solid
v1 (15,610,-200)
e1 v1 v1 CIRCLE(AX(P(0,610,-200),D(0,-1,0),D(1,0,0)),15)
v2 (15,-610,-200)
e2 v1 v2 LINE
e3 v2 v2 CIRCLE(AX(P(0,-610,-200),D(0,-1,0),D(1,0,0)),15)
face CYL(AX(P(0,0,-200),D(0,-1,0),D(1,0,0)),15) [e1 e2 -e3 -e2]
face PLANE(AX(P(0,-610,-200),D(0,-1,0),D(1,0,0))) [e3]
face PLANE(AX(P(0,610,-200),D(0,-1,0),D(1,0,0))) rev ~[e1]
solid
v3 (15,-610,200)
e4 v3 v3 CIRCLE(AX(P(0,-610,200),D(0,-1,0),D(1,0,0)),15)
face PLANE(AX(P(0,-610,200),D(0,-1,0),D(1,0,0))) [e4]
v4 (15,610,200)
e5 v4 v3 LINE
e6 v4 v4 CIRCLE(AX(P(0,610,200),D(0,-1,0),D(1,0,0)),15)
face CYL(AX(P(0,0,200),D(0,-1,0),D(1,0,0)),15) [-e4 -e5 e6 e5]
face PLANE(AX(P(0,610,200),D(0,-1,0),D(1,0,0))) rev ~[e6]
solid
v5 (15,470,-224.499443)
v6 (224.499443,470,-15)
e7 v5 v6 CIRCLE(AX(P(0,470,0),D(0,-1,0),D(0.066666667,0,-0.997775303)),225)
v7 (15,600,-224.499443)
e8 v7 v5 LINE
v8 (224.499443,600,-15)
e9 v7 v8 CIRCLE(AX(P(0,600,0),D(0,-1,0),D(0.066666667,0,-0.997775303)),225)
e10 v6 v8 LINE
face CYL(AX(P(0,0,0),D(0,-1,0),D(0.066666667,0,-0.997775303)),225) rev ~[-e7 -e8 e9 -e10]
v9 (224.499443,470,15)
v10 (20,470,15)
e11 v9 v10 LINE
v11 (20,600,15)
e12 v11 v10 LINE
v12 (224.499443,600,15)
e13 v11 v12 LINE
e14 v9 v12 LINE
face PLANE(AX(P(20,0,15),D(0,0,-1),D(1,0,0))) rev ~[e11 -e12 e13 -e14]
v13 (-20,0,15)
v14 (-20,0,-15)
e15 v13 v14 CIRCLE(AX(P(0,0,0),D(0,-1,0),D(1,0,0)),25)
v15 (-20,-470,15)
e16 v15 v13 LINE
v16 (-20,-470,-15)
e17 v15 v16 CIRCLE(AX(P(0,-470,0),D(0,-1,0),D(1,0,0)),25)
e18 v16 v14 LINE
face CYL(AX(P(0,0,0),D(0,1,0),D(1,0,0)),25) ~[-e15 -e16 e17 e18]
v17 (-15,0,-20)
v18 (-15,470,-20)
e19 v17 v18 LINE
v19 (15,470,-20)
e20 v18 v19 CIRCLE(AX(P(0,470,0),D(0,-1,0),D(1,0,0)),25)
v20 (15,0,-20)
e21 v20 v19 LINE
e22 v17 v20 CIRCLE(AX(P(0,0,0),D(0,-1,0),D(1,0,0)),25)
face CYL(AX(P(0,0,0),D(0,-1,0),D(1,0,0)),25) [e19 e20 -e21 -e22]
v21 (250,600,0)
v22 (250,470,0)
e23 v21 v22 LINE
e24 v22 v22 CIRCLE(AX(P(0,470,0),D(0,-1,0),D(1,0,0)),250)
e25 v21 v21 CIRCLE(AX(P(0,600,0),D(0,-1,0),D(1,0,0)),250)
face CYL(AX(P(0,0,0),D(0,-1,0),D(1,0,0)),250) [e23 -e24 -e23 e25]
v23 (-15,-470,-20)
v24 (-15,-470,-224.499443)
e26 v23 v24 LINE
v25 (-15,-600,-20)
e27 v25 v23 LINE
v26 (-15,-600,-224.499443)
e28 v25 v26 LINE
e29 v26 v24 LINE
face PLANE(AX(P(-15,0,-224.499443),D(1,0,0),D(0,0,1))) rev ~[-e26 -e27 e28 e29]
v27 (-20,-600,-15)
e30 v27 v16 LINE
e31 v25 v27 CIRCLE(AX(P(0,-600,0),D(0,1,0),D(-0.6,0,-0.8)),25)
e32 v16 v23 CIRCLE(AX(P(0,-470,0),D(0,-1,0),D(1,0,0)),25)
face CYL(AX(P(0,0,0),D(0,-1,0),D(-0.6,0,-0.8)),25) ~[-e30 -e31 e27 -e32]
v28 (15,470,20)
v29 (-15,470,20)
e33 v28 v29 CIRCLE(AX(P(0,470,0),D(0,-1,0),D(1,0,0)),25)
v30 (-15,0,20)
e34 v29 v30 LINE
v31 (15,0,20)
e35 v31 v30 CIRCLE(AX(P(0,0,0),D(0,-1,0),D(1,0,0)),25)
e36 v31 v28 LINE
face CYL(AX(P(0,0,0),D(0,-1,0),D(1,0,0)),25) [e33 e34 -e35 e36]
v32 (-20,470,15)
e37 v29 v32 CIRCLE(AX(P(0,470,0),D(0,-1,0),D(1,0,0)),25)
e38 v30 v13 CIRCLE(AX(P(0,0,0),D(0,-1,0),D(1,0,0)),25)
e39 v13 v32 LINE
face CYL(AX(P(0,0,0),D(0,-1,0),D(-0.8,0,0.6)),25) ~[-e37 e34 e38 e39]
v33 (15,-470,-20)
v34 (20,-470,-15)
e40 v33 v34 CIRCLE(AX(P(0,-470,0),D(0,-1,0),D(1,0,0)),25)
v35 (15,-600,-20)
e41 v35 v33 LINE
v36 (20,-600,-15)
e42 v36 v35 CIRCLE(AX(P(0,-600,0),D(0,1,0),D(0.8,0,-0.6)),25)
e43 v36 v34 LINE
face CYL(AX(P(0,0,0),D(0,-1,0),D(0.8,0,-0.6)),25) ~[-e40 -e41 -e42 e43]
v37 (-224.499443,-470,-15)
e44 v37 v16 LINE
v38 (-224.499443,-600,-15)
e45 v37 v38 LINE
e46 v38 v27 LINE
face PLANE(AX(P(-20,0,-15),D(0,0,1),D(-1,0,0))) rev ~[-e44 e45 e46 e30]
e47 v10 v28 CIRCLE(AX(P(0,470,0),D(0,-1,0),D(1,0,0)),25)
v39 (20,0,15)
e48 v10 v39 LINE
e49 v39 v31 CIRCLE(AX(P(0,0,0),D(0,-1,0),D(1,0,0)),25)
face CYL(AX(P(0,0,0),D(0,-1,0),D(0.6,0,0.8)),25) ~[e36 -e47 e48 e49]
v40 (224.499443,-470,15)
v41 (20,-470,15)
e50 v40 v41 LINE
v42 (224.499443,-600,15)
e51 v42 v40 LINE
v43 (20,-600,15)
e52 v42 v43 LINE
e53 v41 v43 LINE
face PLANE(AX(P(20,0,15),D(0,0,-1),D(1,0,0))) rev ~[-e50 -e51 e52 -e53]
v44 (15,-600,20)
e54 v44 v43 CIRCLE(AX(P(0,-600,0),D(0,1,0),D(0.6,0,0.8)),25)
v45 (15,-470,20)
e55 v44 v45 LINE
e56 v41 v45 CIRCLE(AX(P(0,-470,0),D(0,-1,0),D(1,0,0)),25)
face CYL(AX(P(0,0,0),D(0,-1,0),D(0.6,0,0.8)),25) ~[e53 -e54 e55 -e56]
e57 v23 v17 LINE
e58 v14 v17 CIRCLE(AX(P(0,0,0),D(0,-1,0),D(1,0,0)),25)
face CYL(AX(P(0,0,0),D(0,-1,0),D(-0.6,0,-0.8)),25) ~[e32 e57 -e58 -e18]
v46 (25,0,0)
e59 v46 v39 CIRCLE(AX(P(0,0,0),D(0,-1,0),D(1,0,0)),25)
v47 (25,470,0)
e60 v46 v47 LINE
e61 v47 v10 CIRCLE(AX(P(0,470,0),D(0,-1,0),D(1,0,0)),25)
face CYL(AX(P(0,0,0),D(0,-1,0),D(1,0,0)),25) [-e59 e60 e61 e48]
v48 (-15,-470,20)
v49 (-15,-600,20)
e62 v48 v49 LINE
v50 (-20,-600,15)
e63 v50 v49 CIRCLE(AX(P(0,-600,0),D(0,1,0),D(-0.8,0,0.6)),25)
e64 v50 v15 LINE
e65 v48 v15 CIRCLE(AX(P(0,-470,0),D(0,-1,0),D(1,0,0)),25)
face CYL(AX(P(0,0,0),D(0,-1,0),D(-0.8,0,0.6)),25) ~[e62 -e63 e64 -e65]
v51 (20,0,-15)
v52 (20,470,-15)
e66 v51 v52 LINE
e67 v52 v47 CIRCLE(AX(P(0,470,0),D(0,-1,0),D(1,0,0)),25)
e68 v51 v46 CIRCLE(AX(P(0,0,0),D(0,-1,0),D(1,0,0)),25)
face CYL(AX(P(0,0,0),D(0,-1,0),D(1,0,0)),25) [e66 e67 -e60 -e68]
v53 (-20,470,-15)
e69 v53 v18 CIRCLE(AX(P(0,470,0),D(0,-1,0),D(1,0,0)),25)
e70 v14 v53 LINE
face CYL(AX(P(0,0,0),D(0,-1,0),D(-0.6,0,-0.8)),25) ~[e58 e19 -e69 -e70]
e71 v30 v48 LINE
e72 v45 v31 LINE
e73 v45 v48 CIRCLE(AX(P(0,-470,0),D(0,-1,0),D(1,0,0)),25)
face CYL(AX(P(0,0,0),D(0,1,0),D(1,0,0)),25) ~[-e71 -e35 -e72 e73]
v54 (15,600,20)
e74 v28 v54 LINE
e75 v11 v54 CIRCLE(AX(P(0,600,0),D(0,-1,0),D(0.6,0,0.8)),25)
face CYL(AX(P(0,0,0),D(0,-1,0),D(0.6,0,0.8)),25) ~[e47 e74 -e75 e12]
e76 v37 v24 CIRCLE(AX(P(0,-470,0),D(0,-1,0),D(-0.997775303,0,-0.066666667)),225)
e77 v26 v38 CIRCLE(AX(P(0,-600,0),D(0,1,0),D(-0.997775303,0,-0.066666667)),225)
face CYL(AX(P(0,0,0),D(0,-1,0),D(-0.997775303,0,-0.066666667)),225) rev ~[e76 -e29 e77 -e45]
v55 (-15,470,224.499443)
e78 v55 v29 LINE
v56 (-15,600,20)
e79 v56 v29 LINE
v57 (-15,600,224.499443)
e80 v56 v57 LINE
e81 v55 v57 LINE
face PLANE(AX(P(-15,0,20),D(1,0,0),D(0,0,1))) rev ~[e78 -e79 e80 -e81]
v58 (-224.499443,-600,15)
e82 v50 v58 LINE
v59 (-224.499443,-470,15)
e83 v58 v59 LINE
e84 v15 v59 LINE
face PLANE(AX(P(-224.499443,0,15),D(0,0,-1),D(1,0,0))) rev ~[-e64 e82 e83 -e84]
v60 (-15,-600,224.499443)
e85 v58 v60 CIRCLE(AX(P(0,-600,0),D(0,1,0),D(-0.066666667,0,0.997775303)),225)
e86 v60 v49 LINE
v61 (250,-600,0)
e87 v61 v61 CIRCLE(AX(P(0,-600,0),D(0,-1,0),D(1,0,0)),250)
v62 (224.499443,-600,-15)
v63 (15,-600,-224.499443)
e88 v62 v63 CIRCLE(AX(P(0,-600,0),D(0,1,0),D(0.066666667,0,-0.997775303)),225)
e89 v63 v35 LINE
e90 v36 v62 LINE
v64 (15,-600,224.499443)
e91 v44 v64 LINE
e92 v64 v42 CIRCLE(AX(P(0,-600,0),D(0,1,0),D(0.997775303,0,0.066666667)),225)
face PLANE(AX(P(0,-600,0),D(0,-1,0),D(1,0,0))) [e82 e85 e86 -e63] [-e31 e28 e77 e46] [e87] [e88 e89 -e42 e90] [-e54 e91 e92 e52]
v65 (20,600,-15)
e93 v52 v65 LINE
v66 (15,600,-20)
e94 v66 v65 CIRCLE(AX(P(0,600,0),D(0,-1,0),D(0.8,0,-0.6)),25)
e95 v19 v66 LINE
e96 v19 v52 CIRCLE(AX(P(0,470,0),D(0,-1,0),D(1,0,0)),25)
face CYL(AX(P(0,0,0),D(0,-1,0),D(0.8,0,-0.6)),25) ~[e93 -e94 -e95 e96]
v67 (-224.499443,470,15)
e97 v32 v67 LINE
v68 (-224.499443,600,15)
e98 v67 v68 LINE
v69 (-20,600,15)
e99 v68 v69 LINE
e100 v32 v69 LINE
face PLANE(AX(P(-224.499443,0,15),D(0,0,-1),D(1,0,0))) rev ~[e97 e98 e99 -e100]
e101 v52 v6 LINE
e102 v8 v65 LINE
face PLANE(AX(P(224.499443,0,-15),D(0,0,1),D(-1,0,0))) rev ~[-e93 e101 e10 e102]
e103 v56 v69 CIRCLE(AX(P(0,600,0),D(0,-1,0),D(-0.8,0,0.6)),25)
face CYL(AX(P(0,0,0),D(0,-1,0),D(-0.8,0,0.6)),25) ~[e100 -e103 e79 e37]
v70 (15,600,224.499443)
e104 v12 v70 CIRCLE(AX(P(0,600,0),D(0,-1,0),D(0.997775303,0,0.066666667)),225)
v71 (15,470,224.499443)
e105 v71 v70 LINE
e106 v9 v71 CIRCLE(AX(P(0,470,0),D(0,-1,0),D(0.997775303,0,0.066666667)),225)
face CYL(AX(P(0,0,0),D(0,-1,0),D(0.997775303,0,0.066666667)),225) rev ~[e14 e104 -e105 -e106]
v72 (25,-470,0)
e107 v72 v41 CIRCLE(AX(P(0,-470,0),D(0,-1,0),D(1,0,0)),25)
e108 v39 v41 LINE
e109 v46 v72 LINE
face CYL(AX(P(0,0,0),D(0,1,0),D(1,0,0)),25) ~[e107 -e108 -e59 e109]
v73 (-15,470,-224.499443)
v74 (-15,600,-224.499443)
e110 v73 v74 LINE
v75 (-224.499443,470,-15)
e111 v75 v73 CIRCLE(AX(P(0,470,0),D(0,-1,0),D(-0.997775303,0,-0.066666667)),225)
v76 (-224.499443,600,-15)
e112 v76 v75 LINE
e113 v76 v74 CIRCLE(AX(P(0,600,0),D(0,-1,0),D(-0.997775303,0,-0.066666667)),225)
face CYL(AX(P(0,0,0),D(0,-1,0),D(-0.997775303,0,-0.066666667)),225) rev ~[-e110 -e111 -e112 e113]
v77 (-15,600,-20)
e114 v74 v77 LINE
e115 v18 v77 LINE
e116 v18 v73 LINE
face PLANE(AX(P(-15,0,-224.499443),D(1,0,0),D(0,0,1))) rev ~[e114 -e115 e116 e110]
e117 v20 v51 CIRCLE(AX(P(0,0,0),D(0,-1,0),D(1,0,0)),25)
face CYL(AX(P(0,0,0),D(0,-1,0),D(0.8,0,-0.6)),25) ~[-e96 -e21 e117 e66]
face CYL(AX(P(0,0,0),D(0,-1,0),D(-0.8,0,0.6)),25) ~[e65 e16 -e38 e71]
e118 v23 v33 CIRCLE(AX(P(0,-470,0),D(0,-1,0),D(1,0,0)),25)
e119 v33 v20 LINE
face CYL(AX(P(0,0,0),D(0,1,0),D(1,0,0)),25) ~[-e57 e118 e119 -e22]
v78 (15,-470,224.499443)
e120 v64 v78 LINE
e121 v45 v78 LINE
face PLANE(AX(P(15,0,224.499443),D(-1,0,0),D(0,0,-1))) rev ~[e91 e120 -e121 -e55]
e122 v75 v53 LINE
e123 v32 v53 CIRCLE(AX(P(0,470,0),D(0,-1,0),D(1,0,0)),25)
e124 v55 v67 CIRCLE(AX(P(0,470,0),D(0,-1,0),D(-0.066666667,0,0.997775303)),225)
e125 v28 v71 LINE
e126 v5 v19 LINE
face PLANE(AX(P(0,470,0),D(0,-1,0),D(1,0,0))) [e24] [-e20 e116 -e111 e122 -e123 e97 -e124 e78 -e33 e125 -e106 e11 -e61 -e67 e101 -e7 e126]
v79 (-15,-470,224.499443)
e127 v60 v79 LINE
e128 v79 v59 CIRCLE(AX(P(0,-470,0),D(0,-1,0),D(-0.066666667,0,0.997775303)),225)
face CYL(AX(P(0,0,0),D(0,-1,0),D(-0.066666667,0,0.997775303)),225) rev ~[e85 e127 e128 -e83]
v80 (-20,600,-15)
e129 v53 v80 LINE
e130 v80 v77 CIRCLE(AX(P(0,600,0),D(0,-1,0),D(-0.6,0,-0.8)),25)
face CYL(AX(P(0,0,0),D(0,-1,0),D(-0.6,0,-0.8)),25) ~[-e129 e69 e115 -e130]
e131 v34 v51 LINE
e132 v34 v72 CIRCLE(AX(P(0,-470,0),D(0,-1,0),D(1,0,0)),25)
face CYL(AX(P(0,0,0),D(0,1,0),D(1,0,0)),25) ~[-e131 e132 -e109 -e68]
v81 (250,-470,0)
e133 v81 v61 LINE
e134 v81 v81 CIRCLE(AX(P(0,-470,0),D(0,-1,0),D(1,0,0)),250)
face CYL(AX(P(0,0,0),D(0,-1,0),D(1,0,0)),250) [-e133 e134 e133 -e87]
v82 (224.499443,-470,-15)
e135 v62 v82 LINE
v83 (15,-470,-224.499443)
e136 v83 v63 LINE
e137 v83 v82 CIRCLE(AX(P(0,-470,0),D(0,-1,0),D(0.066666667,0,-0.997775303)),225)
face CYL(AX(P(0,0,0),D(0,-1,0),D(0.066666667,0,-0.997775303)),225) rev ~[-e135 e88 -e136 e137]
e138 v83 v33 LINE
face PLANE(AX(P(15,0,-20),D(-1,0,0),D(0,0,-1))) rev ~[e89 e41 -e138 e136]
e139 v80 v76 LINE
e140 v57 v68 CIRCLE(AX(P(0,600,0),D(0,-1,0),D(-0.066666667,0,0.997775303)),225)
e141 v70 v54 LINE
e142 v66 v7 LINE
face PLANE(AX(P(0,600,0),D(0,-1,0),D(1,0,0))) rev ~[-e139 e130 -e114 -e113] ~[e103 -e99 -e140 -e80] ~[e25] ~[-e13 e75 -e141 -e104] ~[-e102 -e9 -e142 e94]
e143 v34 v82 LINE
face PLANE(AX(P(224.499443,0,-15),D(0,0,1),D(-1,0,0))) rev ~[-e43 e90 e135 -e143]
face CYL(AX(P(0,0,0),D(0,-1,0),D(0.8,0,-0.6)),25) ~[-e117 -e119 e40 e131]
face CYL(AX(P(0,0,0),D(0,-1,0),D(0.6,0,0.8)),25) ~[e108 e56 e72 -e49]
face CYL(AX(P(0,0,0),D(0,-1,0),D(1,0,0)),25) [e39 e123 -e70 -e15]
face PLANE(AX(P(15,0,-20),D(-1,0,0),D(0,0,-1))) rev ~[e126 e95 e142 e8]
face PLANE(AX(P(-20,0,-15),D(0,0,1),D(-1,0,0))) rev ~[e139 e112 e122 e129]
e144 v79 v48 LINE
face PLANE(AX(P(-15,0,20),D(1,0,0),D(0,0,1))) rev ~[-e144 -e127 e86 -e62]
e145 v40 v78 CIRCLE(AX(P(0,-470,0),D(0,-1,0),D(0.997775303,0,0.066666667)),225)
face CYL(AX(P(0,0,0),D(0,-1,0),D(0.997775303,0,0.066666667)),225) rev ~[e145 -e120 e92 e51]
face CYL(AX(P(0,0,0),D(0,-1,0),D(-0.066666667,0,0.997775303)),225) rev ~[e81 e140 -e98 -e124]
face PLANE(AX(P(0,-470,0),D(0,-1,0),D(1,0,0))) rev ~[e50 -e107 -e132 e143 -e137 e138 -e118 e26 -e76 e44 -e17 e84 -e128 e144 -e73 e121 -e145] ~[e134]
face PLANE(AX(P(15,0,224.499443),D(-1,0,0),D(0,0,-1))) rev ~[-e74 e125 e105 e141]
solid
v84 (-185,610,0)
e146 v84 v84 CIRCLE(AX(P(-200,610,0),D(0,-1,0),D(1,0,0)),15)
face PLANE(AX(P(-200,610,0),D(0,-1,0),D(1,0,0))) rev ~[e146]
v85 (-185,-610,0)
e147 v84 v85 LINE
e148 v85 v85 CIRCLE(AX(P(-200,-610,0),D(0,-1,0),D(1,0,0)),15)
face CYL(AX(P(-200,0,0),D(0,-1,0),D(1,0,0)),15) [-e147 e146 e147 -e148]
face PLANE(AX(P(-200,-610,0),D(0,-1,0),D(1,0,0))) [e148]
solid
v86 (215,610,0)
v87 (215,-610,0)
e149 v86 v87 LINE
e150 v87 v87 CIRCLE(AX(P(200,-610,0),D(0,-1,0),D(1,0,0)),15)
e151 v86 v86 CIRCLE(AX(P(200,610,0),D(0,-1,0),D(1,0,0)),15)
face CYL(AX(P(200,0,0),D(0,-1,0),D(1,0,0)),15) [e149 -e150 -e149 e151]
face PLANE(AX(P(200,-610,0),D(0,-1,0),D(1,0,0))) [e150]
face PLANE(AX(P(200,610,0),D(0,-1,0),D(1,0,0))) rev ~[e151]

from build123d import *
from build123d import SkipClean  # not in build123d's __all__

# Parameters (mm, degrees)
F0_R          = 250
F1_DEPTH      = 600
F1_DEPTH_BACK = 600
F3_DEPTH      = 600.001
F3_DEPTH_BACK = 600.001
F4_R          = 250
F4_R_2        = 25
F5_DEPTH      = 470
F5_DEPTH_BACK = 470
F6_R          = 15
F7_DEPTH      = 610
F7_DEPTH_BACK = 610


with BuildPart() as f1:
    # F0 (on Front) → F1 (new body, two sides)
    with BuildSketch(Plane.XZ) as f1_sk:
        Circle(F0_R)
    extrude(amount=F1_DEPTH)
    extrude(f1_sk.sketch, amount=-F1_DEPTH_BACK)

    # F2 (on Front) → F3 (cut, two sides)
    with BuildSketch(Plane.XZ) as f3_sk:
        with BuildLine():
            Line((20, 15), (224.4994432064, 15))
            ThreePointArc((224.4994432064, 15), (159.099025767, 159.099025767), (15, 224.4994432064))
            Line((15, 224.4994432064), (15, 20))
            ThreePointArc((15, 20), (17.6776695297, 17.6776695297), (20, 15))
        make_face()
        with BuildLine():
            Line((-15, 20), (-15, 224.4994432064))
            ThreePointArc((-15, 224.4994432064), (-159.099025767, 159.099025767), (-224.4994432064, 15))
            Line((-224.4994432064, 15), (-20, 15))
            ThreePointArc((-20, 15), (-17.6776695297, 17.6776695297), (-15, 20))
        make_face()
        with BuildLine():
            ThreePointArc((-224.4994432064, -15), (-159.099025767, -159.099025767), (-15, -224.4994432064))
            Line((-15, -224.4994432064), (-15, -20))
            ThreePointArc((-15, -20), (-17.6776695297, -17.6776695297), (-20, -15))
            Line((-20, -15), (-224.4994432064, -15))
        make_face()
        with BuildLine():
            ThreePointArc((15, -224.4994432064), (159.099025767, -159.099025767), (224.4994432064, -15))
            Line((224.4994432064, -15), (20, -15))
            ThreePointArc((20, -15), (17.6776695297, -17.6776695297), (15, -20))
            Line((15, -20), (15, -224.4994432064))
        make_face()
    extrude(amount=F3_DEPTH, mode=Mode.SUBTRACT)
    extrude(f3_sk.sketch, amount=-F3_DEPTH_BACK, mode=Mode.SUBTRACT)

    # F4 (on Front) → F5 (cut, two sides)
    with BuildSketch(Plane.XZ) as f5_sk:
        Circle(F4_R)
        Circle(F4_R_2, mode=Mode.SUBTRACT)
    with SkipClean():  # cleaning this boolean's faces spoils the solid; the shape is the same uncleaned
        extrude(amount=-F5_DEPTH, mode=Mode.SUBTRACT)
        extrude(f5_sk.sketch, amount=F5_DEPTH_BACK, mode=Mode.SUBTRACT)


with BuildPart() as f7:
    # F6 (on Front) → F7 (new body, two sides)
    with BuildSketch(Plane.XZ) as f7_sk:
        with Locations((0, 200)):
            Circle(F6_R)
    extrude(amount=F7_DEPTH)
    extrude(f7_sk.sketch, amount=-F7_DEPTH_BACK)


with BuildPart() as f7b:
    # F6 (on Front) → F7, piece 2 (new body, two sides)
    with BuildSketch(Plane.XZ) as f7_2_sk:
        with Locations((-200, 0)):
            Circle(F6_R)
    extrude(amount=F7_DEPTH)
    extrude(f7_2_sk.sketch, amount=-F7_DEPTH_BACK)


with BuildPart() as f7c:
    # F6 (on Front) → F7, piece 3 (new body, two sides)
    with BuildSketch(Plane.XZ) as f7_3_sk:
        with Locations((0, -200)):
            Circle(F6_R)
    extrude(amount=F7_DEPTH)
    extrude(f7_3_sk.sketch, amount=-F7_DEPTH_BACK)


with BuildPart() as f7d:
    # F6 (on Front) → F7, piece 4 (new body, two sides)
    with BuildSketch(Plane.XZ) as f7_4_sk:
        with Locations((200, 0)):
            Circle(F6_R)
    extrude(amount=F7_DEPTH)
    extrude(f7_4_sk.sketch, amount=-F7_DEPTH_BACK)


solid = Compound([f1.part, f7.part, f7b.part, f7c.part, f7d.part])
